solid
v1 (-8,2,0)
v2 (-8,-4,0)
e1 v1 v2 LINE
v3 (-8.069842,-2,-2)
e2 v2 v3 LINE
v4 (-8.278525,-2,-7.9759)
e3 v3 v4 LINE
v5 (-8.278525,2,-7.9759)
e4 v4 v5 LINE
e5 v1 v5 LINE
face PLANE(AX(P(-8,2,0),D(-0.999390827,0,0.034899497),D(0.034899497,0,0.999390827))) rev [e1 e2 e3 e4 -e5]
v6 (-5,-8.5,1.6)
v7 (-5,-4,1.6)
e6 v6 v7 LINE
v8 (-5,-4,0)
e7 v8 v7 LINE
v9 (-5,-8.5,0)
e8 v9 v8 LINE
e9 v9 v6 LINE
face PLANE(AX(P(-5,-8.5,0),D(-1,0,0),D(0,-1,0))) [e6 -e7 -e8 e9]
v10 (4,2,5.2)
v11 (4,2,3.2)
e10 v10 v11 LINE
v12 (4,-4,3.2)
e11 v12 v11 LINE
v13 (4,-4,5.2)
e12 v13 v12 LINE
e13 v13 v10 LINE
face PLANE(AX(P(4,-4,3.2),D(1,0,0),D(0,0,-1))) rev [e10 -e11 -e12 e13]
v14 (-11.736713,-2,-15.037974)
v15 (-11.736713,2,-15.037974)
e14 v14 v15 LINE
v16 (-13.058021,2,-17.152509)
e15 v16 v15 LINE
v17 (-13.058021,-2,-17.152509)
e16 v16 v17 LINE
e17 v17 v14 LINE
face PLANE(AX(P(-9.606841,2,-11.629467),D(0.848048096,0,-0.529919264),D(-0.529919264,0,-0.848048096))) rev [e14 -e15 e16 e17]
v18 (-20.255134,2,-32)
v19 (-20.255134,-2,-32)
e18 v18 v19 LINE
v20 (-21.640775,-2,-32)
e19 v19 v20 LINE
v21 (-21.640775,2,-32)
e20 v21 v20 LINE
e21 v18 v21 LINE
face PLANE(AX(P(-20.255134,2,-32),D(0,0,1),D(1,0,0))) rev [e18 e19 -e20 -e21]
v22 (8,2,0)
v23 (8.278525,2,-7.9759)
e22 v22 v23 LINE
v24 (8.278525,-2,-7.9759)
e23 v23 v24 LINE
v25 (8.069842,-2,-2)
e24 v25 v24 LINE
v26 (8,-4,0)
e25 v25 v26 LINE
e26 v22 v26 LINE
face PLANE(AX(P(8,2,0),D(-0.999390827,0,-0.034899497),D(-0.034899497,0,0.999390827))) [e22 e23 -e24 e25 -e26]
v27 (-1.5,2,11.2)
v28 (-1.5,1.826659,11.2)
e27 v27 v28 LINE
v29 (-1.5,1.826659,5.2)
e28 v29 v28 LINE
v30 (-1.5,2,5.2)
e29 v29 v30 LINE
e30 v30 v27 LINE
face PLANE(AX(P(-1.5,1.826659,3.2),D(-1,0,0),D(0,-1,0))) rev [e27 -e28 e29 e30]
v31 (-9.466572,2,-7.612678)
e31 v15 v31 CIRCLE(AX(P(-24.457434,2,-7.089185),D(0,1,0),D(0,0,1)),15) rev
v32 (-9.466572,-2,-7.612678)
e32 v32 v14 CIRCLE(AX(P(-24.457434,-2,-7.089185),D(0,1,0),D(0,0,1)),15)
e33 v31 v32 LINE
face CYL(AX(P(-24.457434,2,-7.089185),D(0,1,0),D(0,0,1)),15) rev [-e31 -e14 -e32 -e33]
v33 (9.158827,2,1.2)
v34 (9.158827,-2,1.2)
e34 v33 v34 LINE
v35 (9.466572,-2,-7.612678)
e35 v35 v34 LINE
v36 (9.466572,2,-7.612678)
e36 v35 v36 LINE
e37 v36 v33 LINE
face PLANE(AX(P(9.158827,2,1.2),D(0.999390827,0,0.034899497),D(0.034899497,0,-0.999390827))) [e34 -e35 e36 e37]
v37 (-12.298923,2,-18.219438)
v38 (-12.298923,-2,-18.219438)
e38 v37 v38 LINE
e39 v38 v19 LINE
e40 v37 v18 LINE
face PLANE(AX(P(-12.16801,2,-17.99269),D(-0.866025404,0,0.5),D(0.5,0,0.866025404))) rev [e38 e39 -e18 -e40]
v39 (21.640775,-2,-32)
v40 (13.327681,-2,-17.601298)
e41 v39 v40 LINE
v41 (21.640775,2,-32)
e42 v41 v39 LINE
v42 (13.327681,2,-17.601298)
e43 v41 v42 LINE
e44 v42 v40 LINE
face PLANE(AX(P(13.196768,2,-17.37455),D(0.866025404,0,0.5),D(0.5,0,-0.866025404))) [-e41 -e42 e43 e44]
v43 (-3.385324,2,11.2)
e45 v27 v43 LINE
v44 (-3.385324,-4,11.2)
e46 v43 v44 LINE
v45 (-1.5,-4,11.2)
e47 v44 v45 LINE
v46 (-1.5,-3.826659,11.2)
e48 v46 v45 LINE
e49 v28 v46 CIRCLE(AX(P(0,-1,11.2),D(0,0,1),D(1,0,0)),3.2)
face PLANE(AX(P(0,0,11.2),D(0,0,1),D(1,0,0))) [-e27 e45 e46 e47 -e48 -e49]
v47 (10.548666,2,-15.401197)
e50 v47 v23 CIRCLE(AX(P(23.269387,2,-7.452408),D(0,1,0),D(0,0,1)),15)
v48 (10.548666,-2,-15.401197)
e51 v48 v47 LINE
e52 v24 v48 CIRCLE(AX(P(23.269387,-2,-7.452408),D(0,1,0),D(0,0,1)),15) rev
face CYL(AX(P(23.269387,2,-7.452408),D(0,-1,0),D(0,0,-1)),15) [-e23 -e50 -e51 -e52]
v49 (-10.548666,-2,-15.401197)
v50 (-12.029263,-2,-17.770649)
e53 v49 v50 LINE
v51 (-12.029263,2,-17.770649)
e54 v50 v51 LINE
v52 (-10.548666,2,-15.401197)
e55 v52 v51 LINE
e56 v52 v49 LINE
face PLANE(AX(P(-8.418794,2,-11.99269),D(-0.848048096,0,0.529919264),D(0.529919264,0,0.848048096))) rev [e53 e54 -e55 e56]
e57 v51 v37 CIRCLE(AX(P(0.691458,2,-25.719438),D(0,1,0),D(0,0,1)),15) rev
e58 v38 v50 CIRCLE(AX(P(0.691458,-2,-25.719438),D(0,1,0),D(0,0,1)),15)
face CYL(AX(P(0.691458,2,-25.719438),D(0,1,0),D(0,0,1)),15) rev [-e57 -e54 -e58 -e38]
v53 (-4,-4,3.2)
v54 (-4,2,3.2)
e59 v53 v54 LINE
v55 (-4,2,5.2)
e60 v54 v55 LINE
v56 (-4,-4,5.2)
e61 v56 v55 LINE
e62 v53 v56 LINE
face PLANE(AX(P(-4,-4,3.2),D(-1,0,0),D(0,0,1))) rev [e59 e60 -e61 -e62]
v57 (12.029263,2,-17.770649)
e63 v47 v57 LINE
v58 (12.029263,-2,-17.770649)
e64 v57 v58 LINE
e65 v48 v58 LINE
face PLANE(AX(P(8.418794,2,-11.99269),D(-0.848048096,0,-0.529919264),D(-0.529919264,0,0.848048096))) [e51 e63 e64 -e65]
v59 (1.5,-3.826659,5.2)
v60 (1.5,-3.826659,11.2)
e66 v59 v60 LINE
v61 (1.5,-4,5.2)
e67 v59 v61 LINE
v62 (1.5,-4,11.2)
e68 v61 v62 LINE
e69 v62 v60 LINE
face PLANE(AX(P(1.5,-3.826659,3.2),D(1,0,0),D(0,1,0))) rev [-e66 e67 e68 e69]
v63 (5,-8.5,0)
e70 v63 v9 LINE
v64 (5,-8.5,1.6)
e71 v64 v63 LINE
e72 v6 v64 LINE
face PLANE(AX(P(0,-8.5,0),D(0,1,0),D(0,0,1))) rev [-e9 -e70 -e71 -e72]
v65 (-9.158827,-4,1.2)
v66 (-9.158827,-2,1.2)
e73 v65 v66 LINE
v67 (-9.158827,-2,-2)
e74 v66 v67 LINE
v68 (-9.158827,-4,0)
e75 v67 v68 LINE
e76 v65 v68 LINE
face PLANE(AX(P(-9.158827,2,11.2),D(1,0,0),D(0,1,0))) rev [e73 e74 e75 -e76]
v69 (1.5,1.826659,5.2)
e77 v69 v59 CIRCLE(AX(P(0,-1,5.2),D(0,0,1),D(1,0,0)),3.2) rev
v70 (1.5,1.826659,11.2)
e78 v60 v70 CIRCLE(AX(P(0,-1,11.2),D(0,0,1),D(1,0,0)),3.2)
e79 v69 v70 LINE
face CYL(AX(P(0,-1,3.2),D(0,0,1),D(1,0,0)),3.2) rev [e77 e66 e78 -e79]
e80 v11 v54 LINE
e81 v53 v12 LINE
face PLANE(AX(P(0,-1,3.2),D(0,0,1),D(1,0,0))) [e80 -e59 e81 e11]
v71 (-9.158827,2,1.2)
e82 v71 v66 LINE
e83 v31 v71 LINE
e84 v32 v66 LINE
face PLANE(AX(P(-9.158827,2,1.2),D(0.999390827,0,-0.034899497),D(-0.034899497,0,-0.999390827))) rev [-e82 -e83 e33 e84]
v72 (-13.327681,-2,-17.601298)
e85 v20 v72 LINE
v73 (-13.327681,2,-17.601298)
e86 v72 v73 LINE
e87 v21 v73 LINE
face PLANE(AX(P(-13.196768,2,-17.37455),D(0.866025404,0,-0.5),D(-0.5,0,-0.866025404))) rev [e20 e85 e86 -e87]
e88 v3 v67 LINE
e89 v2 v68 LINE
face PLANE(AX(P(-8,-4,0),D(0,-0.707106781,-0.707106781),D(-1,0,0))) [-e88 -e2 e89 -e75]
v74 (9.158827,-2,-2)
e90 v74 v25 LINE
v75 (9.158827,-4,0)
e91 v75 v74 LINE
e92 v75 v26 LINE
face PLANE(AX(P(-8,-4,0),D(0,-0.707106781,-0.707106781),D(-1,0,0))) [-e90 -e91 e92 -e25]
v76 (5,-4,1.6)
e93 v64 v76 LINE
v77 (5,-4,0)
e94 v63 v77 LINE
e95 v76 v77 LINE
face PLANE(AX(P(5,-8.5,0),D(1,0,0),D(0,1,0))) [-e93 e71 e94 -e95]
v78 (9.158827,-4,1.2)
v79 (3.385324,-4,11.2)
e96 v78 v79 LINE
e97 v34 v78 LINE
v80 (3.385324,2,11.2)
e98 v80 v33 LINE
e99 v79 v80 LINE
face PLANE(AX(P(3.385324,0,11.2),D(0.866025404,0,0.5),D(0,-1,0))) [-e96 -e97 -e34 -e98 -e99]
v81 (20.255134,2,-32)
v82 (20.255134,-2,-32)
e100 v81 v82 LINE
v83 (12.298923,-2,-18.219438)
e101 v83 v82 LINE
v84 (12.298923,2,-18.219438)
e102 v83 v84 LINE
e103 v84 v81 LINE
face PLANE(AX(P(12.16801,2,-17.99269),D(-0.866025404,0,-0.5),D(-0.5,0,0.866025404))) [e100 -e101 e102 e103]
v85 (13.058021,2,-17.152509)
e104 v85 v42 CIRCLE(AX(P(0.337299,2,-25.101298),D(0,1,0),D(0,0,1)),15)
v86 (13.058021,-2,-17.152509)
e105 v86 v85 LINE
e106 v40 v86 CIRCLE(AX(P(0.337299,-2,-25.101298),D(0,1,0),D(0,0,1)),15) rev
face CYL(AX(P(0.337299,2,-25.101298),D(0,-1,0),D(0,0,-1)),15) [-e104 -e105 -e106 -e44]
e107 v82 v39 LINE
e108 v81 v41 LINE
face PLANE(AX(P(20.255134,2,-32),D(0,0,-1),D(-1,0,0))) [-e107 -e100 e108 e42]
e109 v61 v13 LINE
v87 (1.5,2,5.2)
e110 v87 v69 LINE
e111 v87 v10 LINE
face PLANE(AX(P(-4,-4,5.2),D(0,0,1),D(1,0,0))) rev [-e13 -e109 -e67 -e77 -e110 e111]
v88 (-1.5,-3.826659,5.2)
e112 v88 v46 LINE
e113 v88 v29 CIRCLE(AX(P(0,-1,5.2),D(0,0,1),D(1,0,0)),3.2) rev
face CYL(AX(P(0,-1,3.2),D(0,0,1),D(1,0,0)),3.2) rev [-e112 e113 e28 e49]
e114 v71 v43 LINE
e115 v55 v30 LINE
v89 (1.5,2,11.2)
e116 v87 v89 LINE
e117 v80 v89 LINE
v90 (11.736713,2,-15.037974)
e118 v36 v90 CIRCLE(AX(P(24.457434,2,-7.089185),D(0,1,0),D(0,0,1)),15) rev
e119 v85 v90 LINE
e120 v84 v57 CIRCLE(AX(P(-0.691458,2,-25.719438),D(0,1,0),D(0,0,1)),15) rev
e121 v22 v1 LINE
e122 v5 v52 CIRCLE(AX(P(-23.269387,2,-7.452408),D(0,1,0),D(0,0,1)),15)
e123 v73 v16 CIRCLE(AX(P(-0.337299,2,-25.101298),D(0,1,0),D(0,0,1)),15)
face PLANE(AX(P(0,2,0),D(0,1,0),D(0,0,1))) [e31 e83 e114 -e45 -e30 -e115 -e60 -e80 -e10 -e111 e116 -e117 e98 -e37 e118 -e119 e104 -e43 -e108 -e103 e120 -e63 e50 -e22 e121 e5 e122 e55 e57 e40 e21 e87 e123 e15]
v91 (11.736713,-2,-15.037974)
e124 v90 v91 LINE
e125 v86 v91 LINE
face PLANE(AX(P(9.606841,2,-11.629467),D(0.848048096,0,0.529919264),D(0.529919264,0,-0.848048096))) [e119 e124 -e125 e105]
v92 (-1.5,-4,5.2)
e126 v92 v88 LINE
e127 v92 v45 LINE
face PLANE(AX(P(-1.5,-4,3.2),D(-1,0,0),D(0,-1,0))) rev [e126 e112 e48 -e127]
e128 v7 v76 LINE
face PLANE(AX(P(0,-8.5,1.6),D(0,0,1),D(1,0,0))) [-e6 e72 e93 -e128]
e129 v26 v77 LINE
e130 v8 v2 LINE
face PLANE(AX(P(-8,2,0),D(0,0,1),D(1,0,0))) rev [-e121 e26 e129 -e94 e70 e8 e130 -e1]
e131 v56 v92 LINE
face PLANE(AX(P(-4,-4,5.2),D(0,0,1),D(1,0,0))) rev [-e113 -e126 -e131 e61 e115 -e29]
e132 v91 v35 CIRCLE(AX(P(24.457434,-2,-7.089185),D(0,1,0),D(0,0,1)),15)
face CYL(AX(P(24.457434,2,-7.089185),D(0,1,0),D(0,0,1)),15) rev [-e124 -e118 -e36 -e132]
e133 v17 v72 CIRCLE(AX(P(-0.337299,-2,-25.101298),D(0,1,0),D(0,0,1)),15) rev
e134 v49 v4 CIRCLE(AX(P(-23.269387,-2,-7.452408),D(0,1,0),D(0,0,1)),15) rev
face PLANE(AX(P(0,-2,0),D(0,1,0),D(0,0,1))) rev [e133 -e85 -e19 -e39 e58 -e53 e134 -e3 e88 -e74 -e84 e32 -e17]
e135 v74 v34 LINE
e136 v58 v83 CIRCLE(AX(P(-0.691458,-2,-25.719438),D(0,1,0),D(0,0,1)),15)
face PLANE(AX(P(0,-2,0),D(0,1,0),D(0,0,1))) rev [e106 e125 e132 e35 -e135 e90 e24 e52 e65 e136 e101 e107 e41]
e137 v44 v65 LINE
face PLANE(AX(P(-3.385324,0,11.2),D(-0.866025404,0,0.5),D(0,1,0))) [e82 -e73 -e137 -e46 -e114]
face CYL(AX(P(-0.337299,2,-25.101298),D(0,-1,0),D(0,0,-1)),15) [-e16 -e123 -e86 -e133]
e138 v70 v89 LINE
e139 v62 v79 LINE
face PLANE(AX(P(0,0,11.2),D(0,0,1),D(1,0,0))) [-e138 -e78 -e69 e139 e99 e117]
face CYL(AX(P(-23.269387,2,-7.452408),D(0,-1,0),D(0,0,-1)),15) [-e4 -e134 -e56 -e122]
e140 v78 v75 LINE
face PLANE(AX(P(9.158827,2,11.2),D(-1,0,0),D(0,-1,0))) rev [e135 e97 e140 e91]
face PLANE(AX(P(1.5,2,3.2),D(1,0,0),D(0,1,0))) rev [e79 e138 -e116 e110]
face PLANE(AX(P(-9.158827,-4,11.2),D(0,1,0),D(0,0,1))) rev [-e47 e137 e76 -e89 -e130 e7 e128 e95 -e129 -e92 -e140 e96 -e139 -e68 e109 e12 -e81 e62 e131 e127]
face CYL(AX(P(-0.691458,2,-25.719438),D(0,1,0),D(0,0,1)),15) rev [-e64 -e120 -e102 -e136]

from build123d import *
from OCP.BRepFilletAPI import BRepFilletAPI_MakeChamfer

# Parameters (mm, degrees)
BOSS_EXTRUDE1_DEPTH             = 2
BOSS_EXTRUDE2_REACH             = 41.681
SKETCH2_W                       = 18.31765306
SKETCH2_H                       = 6
BOSS_EXTRUDE2_DIRECTION_2_DEPTH = 10
CUT_EXTRUDE1_DEPTH              = 8
CUT_EXTRUDE2_DEPTH              = 39.837136106
CUT_EXTRUDE2_DEPTH_BACK         = 39.837136106
SKETCH4_W                       = 8
SKETCH4_H                       = 2
CHAMFER1_SIZE                   = 2
CHAMFER2_SIZE                   = 10
CHAMFER2_SIZE2                  = 5.773502692
FILLET1_START                   = -2
FILLET1_DEPTH                   = 4
FILLET1_2_DEPTH                 = 4
BOSS_EXTRUDE3_START             = -6
SKETCH5_W                       = 10
SKETCH5_H                       = 1.6
BOSS_EXTRUDE3_DEPTH             = 10.5


with BuildPart() as part:
    # Sketch1 → Boss-Extrude1 (new, symmetric)
    with BuildSketch(Plane(origin=(0, 0, 0), x_dir=(1, 0, 0), z_dir=(0, 1, 0))):
        Polygon((-8, 0), (0, 0), (0, -1.2), (-9.15882653, -1.2), (-9.606841403, 11.62946737), (-13.196767517, 17.374550089), (-21.640774961, 32), (-20.255134315, 32), (-12.168010072, 17.992689924), (-8.41879396, 11.992689924), align=None)
    boss_extrude1 = extrude(amount=BOSS_EXTRUDE1_DEPTH, both=True)

    # Mirror1: Boss-Extrude1 across plane
    add(boss_extrude1.mirror(Plane(origin=(0, 2, 0), x_dir=(0, 0, 1), z_dir=(-1, 0, 0))))

    # Boss-Extrude2: up to this face of the body (flat: up to its plane)
    boss_extrude2_end = Plane(part.part.faces().sort_by_distance((0, 0, 0))[0])
    # Sketch2 → Boss-Extrude2 (add, up to the picked face)
    with BuildSketch(Plane.XY.offset(1.2), mode=Mode.PRIVATE) as boss_extrude2_sk1:
        with Locations((0, -1)):
            Rectangle(SKETCH2_W, SKETCH2_H)
    boss_extrude2_tool1 = split(extrude(boss_extrude2_sk1.sketch, amount=-BOSS_EXTRUDE2_REACH, mode=Mode.PRIVATE), bisect_by=boss_extrude2_end, keep=Keep.BOTH, mode=Mode.PRIVATE)
    add(boss_extrude2_tool1.solids().sort_by(Axis((0, -1, 1.2), (0, 0, -1)))[0])

    # Sketch2 → Boss-Extrude2 direction 2 (add)
    with BuildSketch(Plane.XY.offset(1.2)):
        with Locations((0, -1)):
            Rectangle(SKETCH2_W, SKETCH2_H)
    extrude(amount=BOSS_EXTRUDE2_DIRECTION_2_DEPTH)

    # Sketch3 → Cut-Extrude1 (cut)
    with BuildSketch(Plane.XY.offset(11.2)):
        with BuildLine():
            Line((-1.5, 1.826658805), (-1.5, 2))
            Line((-1.5, 2), (1.5, 2))
            Line((1.5, 2), (1.5, 1.826658805))
            ThreePointArc((1.5, 1.826658805), (3.2, -1), (1.5, -3.826658805))
            Line((1.5, -3.826658805), (1.5, -4))
            Line((1.5, -4), (-1.5, -4))
            Line((-1.5, -4), (-1.5, -3.826658805))
            ThreePointArc((-1.5, -3.826658805), (-3.2, -1), (-1.5, 1.826658805))
        make_face()
    extrude(amount=-CUT_EXTRUDE1_DEPTH, mode=Mode.SUBTRACT)

    # Sketch4 → Cut-Extrude2 (cut, two sides: drawn at the far end of the back side and taken through both)
    with BuildSketch(Plane(origin=(0, 0, 0), x_dir=(1, 0, 0), z_dir=(0, 1, 0)).offset(-CUT_EXTRUDE2_DEPTH_BACK)):
        with Locations((0, -4.2)):
            Rectangle(SKETCH4_W, SKETCH4_H)
    extrude(amount=CUT_EXTRUDE2_DEPTH + CUT_EXTRUDE2_DEPTH_BACK, mode=Mode.SUBTRACT)

    # Chamfer1
    chamfer1_edges = [part.edges().sort_by_distance(p)[0] for p in [
        (8.579413265, -2, 0),
        (-8.579413265, -2, 0),
    ]]
    chamfer(chamfer1_edges, length=CHAMFER1_SIZE - 0.0001)  # a hair under: the kernel refuses the full size

    # Chamfer2: one chamfer whose edges measure the first distance from different faces: ONE call of the kernel's chamfer builder (chamfer() names one face for all edges)
    chamfer2_edges_1 = [part.edges().sort_by_distance(p)[0] for p in [
        (9.15882653, -1, 11.2),
    ]]
    chamfer2_side_1 = [part.faces().sort_by_distance(p)[0] for p in [
        (9.15882653, -1.126288177, 5.77807488),
    ]]
    chamfer2_edges_2 = [part.edges().sort_by_distance(p)[0] for p in [
        (-9.15882653, -1, 11.2),
    ]]
    chamfer2_side_2 = [part.faces().sort_by_distance(p)[0] for p in [
        (-9.15882653, -1.126288177, 5.77807488),
    ]]
    chamfer2 = BRepFilletAPI_MakeChamfer(part.part.solid().wrapped)
    for e in chamfer2_edges_1:
        chamfer2.Add(CHAMFER2_SIZE, CHAMFER2_SIZE2, e.wrapped, chamfer2_side_1[0].wrapped)  # the first distance lies on this face
    for e in chamfer2_edges_2:
        chamfer2.Add(CHAMFER2_SIZE, CHAMFER2_SIZE2, e.wrapped, chamfer2_side_2[0].wrapped)  # the first distance lies on this face
    add(Compound.cast(chamfer2.Shape()), mode=Mode.REPLACE)

    # Fillet1: read off the stored shape, not the designer's step
    # Fillet1 outline → Fillet1 (cut)
    with BuildSketch(Plane(origin=(0, 0, 0), x_dir=(1, 0, 0), z_dir=(0, 1, 0)).offset(FILLET1_START)):
        with BuildLine():
            Line((13.196767517, 17.374550089), (13.327680504, 17.601298033))
            ThreePointArc((13.327680504, 17.601298033), (13.194808958, 17.37572691), (13.05802089, 17.15250907))
            Line((13.05802089, 17.15250907), (13.196767517, 17.374550089))
        make_face()
        with BuildLine():
            ThreePointArc((8.278524581, 7.975900449), (8.924815647, 11.837983569), (10.548665544, 15.401196962))
            Line((10.548665544, 15.401196962), (8.41879396, 11.992689924))
            Line((8.41879396, 11.992689924), (8.278524581, 7.975900449))
        make_face()
        with BuildLine():
            Line((-13.196767517, 17.374550089), (-13.05802089, 17.15250907))
            ThreePointArc((-13.05802089, 17.15250907), (-13.194808958, 17.37572691), (-13.327680504, 17.601298033))
            Line((-13.327680504, 17.601298033), (-13.196767517, 17.374550089))
        make_face()
        with BuildLine():
            Line((-8.41879396, 11.992689924), (-10.548665544, 15.401196962))
            ThreePointArc((-10.548665544, 15.401196962), (-8.924815647, 11.837983569), (-8.278524581, 7.975900449))
            Line((-8.278524581, 7.975900449), (-8.41879396, 11.992689924))
        make_face()
    extrude(amount=FILLET1_DEPTH, mode=Mode.SUBTRACT)

    # Fillet1 2 outline → Fillet1 2 (add)
    with BuildSketch(Plane(origin=(0, 0, 0), x_dir=(1, 0, 0), z_dir=(0, 1, 0)).offset(FILLET1_START)):
        with BuildLine():
            ThreePointArc((9.466572023, 7.612677895), (10.112863089, 11.474761015), (11.736712986, 15.037974408))
            Line((11.736712986, 15.037974408), (9.606841403, 11.62946737))
            Line((9.606841403, 11.62946737), (9.466572023, 7.612677895))
        make_face()
        with BuildLine():
            ThreePointArc((12.298923059, 18.219437869), (12.166051513, 17.993866745), (12.029263444, 17.770648906))
            Line((12.029263444, 17.770648906), (12.168010072, 17.992689924))
            Line((12.168010072, 17.992689924), (12.298923059, 18.219437869))
        make_face()
        with BuildLine():
            Line((-9.606841403, 11.62946737), (-11.736712986, 15.037974408))
            ThreePointArc((-11.736712986, 15.037974408), (-10.112863089, 11.474761015), (-9.466572023, 7.612677895))
            Line((-9.466572023, 7.612677895), (-9.606841403, 11.62946737))
        make_face()
        with BuildLine():
            ThreePointArc((-12.029263444, 17.770648906), (-12.166051513, 17.993866745), (-12.298923059, 18.219437869))
            Line((-12.298923059, 18.219437869), (-12.168010072, 17.992689924))
            Line((-12.168010072, 17.992689924), (-12.029263444, 17.770648906))
        make_face()
    extrude(amount=FILLET1_2_DEPTH)

    # Sketch5 → Boss-Extrude3 (add)
    with BuildSketch(Plane.XZ.offset(4).offset(BOSS_EXTRUDE3_START)):
        with Locations((0, 0.8)):
            Rectangle(SKETCH5_W, SKETCH5_H)
    extrude(amount=BOSS_EXTRUDE3_DEPTH)


solid = part.part
